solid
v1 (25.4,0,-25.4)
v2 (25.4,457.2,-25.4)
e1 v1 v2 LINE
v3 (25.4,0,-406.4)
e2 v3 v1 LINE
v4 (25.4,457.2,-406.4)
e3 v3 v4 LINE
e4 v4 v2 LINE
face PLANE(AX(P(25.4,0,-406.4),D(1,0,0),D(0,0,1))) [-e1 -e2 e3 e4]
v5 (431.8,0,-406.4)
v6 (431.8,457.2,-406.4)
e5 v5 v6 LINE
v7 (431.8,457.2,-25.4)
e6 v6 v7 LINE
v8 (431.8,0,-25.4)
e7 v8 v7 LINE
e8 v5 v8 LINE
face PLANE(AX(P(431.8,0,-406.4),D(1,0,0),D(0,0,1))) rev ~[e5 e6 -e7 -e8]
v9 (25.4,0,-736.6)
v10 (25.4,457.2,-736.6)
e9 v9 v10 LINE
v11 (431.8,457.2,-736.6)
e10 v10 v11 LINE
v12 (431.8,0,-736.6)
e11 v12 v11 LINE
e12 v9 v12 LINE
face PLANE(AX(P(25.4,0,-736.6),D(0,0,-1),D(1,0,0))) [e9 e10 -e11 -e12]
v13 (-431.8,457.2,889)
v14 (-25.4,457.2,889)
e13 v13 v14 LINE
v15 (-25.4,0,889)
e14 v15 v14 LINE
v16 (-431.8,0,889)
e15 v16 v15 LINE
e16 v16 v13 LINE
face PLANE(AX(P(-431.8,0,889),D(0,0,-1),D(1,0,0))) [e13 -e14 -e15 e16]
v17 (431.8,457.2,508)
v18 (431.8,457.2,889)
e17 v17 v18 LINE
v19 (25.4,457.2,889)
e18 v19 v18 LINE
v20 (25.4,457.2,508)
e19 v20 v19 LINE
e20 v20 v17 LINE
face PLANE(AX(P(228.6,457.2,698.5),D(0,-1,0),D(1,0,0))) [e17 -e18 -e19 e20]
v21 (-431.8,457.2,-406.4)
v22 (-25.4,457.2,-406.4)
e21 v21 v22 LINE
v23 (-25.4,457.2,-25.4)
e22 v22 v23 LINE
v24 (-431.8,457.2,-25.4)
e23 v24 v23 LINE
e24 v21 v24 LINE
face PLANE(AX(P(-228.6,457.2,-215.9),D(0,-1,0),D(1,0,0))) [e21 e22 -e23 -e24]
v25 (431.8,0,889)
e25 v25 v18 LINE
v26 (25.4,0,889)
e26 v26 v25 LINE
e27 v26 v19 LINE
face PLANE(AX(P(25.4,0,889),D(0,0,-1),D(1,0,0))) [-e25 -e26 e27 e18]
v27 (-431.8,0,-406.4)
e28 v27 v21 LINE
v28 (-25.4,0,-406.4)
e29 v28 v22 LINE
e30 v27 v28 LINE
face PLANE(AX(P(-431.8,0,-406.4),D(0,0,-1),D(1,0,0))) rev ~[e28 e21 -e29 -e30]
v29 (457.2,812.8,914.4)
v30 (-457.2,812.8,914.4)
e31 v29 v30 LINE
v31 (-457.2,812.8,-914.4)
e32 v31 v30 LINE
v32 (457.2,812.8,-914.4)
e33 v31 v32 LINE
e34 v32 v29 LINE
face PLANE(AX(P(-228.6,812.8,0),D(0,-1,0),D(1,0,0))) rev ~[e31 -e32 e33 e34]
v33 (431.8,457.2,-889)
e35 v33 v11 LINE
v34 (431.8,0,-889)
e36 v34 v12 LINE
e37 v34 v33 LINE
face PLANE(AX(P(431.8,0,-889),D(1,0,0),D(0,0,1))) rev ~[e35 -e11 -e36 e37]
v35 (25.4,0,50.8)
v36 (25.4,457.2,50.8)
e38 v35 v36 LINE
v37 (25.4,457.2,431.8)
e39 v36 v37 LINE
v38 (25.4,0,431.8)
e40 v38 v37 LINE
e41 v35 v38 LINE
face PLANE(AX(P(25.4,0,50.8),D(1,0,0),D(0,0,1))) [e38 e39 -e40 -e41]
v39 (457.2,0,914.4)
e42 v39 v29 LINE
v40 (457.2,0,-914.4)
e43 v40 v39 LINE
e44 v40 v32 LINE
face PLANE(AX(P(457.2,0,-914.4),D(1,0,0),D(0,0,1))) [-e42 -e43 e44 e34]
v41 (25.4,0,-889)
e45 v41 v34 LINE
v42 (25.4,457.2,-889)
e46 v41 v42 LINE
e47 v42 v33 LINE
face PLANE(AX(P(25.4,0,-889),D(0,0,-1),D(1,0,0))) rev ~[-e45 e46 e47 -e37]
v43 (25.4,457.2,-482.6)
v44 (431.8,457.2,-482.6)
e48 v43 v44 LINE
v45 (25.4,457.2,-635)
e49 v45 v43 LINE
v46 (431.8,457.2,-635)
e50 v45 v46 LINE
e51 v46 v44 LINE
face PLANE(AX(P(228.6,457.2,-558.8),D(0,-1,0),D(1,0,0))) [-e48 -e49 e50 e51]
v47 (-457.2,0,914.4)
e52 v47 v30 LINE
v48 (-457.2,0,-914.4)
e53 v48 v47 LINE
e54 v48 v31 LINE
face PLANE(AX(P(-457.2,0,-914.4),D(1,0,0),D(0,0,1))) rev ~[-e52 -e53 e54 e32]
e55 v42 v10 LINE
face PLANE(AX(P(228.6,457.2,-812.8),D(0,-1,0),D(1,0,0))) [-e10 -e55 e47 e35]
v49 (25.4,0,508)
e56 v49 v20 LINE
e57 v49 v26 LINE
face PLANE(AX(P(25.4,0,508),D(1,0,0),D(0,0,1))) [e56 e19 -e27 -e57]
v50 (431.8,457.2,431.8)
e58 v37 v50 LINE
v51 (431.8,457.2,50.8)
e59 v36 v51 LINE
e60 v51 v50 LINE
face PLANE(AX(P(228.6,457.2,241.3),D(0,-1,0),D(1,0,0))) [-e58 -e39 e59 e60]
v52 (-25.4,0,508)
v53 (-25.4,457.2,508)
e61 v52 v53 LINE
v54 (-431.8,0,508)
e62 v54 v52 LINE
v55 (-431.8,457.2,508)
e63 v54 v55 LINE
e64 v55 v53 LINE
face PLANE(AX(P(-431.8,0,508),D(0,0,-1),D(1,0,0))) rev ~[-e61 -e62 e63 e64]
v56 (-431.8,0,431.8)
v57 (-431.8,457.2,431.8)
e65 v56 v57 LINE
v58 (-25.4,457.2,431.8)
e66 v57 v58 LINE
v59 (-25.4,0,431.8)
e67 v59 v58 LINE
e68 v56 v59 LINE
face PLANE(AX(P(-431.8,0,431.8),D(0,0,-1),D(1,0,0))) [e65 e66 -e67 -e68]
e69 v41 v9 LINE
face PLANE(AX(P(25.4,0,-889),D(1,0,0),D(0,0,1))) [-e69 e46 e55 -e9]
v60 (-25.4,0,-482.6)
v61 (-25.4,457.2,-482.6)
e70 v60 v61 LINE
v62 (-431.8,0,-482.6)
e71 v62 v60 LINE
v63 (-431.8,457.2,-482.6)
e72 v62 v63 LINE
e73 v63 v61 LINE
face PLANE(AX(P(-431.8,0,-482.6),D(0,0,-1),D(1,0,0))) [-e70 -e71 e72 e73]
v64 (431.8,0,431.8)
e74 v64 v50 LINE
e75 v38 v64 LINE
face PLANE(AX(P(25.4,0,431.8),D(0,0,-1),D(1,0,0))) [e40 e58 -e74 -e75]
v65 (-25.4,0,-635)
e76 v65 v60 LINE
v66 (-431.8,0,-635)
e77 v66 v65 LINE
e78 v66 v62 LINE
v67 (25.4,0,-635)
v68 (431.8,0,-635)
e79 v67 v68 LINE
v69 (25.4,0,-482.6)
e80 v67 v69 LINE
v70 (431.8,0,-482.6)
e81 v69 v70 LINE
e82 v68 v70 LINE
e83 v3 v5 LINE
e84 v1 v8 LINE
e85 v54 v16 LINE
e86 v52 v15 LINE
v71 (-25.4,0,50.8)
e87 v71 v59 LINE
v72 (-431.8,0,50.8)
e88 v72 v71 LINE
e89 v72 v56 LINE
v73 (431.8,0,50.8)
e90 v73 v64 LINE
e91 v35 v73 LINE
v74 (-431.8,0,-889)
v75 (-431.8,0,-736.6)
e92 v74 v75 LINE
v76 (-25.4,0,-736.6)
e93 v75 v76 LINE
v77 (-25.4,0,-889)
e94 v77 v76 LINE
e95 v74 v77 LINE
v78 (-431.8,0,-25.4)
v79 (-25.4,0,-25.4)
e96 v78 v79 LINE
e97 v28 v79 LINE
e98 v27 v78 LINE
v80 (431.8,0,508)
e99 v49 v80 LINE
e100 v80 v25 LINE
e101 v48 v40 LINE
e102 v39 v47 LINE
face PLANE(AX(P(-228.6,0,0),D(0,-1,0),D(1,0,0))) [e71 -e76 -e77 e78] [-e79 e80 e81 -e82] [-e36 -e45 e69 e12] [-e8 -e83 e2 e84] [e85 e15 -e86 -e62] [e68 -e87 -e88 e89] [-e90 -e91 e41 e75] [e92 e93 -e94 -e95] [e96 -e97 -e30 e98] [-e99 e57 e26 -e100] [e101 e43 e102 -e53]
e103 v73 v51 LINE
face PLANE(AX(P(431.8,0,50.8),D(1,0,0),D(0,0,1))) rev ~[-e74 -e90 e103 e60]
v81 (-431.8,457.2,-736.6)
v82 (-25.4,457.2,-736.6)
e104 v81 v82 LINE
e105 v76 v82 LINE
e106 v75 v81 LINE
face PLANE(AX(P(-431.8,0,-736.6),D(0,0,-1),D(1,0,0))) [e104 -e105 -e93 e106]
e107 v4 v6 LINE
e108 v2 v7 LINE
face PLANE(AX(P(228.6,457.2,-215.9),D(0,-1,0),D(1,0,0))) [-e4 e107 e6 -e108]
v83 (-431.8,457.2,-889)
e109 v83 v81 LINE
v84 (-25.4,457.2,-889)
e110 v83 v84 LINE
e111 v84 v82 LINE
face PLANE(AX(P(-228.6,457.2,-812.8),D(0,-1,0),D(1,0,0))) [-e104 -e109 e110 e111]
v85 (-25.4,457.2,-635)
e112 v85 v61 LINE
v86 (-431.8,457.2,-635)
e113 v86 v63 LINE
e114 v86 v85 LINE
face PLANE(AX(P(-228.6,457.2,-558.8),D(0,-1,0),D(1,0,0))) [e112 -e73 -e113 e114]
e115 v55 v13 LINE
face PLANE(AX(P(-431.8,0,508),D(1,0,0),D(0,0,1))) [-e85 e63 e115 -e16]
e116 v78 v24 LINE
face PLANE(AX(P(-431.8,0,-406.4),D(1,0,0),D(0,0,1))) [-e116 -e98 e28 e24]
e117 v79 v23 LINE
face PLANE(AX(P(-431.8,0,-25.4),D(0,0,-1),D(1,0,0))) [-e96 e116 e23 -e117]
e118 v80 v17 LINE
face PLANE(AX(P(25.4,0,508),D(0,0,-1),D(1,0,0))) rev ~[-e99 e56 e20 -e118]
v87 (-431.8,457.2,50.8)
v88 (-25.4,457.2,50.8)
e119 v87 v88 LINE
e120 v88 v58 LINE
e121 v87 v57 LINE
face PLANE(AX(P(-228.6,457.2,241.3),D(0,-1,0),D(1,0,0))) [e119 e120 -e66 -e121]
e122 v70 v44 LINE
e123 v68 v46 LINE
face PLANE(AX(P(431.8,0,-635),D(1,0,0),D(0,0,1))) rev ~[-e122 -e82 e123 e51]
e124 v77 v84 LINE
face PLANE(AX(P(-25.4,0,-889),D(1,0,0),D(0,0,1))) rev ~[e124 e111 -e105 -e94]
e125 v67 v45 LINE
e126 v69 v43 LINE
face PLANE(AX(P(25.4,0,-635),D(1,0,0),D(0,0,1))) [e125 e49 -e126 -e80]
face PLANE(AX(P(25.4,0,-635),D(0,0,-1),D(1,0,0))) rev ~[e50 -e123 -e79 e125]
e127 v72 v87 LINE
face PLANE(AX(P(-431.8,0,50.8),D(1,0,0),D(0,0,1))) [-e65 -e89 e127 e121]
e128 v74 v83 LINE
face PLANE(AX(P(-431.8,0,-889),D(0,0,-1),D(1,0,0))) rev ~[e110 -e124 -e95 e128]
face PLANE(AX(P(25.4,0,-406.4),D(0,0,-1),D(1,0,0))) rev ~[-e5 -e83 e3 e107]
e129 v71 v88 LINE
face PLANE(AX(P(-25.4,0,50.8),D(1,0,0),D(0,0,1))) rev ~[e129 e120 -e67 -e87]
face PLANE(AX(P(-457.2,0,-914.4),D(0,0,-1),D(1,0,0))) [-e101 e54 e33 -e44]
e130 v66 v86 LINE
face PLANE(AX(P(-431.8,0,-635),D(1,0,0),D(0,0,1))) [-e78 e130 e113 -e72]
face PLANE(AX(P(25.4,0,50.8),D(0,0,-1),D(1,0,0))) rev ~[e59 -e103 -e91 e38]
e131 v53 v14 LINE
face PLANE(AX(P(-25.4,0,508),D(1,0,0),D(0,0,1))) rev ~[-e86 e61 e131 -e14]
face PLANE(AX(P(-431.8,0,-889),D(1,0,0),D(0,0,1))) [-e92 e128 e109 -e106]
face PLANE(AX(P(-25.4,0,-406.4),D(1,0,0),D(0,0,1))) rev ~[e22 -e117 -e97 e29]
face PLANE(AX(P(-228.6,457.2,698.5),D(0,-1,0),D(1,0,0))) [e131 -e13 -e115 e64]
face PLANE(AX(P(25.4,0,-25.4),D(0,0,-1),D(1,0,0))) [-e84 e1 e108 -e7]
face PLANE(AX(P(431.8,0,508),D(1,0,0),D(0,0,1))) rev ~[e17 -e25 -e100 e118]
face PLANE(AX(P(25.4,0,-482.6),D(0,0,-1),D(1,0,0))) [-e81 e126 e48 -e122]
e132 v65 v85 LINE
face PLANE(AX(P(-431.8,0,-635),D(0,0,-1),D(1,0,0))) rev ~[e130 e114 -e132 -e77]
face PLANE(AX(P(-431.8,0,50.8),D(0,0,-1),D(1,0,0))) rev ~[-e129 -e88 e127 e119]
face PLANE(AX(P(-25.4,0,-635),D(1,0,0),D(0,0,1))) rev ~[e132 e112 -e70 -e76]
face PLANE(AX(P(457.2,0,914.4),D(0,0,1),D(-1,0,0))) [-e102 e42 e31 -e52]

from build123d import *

# Parameters (mm, degrees)
F0_W     = 457.2
F0_H     = 1828.8
F1_DEPTH = 812.8
F2_W     = 406.4
F2_H     = 381
F2_H_2   = 152.4
F3_DEPTH = 457.2


with BuildPart() as f1:
    # F0 (on Front) → F1 (new body)
    with BuildSketch(Plane.XZ):
        with Locations((-228.6, 0)):
            Rectangle(F0_W, F0_H)
        with Locations((228.6, 0)):
            Rectangle(F0_W, F0_H)
    extrude(amount=-F1_DEPTH)

    # F2 (on face) → F3 (cut)
    with BuildSketch(Plane.XZ):
        with Locations((228.6, 698.5)):
            Rectangle(F2_W, F2_H)
        with Locations((228.6, 241.3)):
            Rectangle(F2_W, F2_H)
        with Locations((-228.6, 698.5)):
            Rectangle(F2_W, F2_H)
        with Locations((228.6, -215.9)):
            Rectangle(F2_W, F2_H)
        with Locations((-228.6, 241.3)):
            Rectangle(F2_W, F2_H)
        with Locations((228.6, -558.8)):
            Rectangle(F2_W, F2_H_2)
        with Locations((-228.6, -215.9)):
            Rectangle(F2_W, F2_H)
        with Locations((228.6, -812.8)):
            Rectangle(F2_W, F2_H_2)
        with Locations((-228.6, -558.8)):
            Rectangle(F2_W, F2_H_2)
        with Locations((-228.6, -812.8)):
            Rectangle(F2_W, F2_H_2)
    extrude(amount=-F3_DEPTH, mode=Mode.SUBTRACT)


solid = f1.part
